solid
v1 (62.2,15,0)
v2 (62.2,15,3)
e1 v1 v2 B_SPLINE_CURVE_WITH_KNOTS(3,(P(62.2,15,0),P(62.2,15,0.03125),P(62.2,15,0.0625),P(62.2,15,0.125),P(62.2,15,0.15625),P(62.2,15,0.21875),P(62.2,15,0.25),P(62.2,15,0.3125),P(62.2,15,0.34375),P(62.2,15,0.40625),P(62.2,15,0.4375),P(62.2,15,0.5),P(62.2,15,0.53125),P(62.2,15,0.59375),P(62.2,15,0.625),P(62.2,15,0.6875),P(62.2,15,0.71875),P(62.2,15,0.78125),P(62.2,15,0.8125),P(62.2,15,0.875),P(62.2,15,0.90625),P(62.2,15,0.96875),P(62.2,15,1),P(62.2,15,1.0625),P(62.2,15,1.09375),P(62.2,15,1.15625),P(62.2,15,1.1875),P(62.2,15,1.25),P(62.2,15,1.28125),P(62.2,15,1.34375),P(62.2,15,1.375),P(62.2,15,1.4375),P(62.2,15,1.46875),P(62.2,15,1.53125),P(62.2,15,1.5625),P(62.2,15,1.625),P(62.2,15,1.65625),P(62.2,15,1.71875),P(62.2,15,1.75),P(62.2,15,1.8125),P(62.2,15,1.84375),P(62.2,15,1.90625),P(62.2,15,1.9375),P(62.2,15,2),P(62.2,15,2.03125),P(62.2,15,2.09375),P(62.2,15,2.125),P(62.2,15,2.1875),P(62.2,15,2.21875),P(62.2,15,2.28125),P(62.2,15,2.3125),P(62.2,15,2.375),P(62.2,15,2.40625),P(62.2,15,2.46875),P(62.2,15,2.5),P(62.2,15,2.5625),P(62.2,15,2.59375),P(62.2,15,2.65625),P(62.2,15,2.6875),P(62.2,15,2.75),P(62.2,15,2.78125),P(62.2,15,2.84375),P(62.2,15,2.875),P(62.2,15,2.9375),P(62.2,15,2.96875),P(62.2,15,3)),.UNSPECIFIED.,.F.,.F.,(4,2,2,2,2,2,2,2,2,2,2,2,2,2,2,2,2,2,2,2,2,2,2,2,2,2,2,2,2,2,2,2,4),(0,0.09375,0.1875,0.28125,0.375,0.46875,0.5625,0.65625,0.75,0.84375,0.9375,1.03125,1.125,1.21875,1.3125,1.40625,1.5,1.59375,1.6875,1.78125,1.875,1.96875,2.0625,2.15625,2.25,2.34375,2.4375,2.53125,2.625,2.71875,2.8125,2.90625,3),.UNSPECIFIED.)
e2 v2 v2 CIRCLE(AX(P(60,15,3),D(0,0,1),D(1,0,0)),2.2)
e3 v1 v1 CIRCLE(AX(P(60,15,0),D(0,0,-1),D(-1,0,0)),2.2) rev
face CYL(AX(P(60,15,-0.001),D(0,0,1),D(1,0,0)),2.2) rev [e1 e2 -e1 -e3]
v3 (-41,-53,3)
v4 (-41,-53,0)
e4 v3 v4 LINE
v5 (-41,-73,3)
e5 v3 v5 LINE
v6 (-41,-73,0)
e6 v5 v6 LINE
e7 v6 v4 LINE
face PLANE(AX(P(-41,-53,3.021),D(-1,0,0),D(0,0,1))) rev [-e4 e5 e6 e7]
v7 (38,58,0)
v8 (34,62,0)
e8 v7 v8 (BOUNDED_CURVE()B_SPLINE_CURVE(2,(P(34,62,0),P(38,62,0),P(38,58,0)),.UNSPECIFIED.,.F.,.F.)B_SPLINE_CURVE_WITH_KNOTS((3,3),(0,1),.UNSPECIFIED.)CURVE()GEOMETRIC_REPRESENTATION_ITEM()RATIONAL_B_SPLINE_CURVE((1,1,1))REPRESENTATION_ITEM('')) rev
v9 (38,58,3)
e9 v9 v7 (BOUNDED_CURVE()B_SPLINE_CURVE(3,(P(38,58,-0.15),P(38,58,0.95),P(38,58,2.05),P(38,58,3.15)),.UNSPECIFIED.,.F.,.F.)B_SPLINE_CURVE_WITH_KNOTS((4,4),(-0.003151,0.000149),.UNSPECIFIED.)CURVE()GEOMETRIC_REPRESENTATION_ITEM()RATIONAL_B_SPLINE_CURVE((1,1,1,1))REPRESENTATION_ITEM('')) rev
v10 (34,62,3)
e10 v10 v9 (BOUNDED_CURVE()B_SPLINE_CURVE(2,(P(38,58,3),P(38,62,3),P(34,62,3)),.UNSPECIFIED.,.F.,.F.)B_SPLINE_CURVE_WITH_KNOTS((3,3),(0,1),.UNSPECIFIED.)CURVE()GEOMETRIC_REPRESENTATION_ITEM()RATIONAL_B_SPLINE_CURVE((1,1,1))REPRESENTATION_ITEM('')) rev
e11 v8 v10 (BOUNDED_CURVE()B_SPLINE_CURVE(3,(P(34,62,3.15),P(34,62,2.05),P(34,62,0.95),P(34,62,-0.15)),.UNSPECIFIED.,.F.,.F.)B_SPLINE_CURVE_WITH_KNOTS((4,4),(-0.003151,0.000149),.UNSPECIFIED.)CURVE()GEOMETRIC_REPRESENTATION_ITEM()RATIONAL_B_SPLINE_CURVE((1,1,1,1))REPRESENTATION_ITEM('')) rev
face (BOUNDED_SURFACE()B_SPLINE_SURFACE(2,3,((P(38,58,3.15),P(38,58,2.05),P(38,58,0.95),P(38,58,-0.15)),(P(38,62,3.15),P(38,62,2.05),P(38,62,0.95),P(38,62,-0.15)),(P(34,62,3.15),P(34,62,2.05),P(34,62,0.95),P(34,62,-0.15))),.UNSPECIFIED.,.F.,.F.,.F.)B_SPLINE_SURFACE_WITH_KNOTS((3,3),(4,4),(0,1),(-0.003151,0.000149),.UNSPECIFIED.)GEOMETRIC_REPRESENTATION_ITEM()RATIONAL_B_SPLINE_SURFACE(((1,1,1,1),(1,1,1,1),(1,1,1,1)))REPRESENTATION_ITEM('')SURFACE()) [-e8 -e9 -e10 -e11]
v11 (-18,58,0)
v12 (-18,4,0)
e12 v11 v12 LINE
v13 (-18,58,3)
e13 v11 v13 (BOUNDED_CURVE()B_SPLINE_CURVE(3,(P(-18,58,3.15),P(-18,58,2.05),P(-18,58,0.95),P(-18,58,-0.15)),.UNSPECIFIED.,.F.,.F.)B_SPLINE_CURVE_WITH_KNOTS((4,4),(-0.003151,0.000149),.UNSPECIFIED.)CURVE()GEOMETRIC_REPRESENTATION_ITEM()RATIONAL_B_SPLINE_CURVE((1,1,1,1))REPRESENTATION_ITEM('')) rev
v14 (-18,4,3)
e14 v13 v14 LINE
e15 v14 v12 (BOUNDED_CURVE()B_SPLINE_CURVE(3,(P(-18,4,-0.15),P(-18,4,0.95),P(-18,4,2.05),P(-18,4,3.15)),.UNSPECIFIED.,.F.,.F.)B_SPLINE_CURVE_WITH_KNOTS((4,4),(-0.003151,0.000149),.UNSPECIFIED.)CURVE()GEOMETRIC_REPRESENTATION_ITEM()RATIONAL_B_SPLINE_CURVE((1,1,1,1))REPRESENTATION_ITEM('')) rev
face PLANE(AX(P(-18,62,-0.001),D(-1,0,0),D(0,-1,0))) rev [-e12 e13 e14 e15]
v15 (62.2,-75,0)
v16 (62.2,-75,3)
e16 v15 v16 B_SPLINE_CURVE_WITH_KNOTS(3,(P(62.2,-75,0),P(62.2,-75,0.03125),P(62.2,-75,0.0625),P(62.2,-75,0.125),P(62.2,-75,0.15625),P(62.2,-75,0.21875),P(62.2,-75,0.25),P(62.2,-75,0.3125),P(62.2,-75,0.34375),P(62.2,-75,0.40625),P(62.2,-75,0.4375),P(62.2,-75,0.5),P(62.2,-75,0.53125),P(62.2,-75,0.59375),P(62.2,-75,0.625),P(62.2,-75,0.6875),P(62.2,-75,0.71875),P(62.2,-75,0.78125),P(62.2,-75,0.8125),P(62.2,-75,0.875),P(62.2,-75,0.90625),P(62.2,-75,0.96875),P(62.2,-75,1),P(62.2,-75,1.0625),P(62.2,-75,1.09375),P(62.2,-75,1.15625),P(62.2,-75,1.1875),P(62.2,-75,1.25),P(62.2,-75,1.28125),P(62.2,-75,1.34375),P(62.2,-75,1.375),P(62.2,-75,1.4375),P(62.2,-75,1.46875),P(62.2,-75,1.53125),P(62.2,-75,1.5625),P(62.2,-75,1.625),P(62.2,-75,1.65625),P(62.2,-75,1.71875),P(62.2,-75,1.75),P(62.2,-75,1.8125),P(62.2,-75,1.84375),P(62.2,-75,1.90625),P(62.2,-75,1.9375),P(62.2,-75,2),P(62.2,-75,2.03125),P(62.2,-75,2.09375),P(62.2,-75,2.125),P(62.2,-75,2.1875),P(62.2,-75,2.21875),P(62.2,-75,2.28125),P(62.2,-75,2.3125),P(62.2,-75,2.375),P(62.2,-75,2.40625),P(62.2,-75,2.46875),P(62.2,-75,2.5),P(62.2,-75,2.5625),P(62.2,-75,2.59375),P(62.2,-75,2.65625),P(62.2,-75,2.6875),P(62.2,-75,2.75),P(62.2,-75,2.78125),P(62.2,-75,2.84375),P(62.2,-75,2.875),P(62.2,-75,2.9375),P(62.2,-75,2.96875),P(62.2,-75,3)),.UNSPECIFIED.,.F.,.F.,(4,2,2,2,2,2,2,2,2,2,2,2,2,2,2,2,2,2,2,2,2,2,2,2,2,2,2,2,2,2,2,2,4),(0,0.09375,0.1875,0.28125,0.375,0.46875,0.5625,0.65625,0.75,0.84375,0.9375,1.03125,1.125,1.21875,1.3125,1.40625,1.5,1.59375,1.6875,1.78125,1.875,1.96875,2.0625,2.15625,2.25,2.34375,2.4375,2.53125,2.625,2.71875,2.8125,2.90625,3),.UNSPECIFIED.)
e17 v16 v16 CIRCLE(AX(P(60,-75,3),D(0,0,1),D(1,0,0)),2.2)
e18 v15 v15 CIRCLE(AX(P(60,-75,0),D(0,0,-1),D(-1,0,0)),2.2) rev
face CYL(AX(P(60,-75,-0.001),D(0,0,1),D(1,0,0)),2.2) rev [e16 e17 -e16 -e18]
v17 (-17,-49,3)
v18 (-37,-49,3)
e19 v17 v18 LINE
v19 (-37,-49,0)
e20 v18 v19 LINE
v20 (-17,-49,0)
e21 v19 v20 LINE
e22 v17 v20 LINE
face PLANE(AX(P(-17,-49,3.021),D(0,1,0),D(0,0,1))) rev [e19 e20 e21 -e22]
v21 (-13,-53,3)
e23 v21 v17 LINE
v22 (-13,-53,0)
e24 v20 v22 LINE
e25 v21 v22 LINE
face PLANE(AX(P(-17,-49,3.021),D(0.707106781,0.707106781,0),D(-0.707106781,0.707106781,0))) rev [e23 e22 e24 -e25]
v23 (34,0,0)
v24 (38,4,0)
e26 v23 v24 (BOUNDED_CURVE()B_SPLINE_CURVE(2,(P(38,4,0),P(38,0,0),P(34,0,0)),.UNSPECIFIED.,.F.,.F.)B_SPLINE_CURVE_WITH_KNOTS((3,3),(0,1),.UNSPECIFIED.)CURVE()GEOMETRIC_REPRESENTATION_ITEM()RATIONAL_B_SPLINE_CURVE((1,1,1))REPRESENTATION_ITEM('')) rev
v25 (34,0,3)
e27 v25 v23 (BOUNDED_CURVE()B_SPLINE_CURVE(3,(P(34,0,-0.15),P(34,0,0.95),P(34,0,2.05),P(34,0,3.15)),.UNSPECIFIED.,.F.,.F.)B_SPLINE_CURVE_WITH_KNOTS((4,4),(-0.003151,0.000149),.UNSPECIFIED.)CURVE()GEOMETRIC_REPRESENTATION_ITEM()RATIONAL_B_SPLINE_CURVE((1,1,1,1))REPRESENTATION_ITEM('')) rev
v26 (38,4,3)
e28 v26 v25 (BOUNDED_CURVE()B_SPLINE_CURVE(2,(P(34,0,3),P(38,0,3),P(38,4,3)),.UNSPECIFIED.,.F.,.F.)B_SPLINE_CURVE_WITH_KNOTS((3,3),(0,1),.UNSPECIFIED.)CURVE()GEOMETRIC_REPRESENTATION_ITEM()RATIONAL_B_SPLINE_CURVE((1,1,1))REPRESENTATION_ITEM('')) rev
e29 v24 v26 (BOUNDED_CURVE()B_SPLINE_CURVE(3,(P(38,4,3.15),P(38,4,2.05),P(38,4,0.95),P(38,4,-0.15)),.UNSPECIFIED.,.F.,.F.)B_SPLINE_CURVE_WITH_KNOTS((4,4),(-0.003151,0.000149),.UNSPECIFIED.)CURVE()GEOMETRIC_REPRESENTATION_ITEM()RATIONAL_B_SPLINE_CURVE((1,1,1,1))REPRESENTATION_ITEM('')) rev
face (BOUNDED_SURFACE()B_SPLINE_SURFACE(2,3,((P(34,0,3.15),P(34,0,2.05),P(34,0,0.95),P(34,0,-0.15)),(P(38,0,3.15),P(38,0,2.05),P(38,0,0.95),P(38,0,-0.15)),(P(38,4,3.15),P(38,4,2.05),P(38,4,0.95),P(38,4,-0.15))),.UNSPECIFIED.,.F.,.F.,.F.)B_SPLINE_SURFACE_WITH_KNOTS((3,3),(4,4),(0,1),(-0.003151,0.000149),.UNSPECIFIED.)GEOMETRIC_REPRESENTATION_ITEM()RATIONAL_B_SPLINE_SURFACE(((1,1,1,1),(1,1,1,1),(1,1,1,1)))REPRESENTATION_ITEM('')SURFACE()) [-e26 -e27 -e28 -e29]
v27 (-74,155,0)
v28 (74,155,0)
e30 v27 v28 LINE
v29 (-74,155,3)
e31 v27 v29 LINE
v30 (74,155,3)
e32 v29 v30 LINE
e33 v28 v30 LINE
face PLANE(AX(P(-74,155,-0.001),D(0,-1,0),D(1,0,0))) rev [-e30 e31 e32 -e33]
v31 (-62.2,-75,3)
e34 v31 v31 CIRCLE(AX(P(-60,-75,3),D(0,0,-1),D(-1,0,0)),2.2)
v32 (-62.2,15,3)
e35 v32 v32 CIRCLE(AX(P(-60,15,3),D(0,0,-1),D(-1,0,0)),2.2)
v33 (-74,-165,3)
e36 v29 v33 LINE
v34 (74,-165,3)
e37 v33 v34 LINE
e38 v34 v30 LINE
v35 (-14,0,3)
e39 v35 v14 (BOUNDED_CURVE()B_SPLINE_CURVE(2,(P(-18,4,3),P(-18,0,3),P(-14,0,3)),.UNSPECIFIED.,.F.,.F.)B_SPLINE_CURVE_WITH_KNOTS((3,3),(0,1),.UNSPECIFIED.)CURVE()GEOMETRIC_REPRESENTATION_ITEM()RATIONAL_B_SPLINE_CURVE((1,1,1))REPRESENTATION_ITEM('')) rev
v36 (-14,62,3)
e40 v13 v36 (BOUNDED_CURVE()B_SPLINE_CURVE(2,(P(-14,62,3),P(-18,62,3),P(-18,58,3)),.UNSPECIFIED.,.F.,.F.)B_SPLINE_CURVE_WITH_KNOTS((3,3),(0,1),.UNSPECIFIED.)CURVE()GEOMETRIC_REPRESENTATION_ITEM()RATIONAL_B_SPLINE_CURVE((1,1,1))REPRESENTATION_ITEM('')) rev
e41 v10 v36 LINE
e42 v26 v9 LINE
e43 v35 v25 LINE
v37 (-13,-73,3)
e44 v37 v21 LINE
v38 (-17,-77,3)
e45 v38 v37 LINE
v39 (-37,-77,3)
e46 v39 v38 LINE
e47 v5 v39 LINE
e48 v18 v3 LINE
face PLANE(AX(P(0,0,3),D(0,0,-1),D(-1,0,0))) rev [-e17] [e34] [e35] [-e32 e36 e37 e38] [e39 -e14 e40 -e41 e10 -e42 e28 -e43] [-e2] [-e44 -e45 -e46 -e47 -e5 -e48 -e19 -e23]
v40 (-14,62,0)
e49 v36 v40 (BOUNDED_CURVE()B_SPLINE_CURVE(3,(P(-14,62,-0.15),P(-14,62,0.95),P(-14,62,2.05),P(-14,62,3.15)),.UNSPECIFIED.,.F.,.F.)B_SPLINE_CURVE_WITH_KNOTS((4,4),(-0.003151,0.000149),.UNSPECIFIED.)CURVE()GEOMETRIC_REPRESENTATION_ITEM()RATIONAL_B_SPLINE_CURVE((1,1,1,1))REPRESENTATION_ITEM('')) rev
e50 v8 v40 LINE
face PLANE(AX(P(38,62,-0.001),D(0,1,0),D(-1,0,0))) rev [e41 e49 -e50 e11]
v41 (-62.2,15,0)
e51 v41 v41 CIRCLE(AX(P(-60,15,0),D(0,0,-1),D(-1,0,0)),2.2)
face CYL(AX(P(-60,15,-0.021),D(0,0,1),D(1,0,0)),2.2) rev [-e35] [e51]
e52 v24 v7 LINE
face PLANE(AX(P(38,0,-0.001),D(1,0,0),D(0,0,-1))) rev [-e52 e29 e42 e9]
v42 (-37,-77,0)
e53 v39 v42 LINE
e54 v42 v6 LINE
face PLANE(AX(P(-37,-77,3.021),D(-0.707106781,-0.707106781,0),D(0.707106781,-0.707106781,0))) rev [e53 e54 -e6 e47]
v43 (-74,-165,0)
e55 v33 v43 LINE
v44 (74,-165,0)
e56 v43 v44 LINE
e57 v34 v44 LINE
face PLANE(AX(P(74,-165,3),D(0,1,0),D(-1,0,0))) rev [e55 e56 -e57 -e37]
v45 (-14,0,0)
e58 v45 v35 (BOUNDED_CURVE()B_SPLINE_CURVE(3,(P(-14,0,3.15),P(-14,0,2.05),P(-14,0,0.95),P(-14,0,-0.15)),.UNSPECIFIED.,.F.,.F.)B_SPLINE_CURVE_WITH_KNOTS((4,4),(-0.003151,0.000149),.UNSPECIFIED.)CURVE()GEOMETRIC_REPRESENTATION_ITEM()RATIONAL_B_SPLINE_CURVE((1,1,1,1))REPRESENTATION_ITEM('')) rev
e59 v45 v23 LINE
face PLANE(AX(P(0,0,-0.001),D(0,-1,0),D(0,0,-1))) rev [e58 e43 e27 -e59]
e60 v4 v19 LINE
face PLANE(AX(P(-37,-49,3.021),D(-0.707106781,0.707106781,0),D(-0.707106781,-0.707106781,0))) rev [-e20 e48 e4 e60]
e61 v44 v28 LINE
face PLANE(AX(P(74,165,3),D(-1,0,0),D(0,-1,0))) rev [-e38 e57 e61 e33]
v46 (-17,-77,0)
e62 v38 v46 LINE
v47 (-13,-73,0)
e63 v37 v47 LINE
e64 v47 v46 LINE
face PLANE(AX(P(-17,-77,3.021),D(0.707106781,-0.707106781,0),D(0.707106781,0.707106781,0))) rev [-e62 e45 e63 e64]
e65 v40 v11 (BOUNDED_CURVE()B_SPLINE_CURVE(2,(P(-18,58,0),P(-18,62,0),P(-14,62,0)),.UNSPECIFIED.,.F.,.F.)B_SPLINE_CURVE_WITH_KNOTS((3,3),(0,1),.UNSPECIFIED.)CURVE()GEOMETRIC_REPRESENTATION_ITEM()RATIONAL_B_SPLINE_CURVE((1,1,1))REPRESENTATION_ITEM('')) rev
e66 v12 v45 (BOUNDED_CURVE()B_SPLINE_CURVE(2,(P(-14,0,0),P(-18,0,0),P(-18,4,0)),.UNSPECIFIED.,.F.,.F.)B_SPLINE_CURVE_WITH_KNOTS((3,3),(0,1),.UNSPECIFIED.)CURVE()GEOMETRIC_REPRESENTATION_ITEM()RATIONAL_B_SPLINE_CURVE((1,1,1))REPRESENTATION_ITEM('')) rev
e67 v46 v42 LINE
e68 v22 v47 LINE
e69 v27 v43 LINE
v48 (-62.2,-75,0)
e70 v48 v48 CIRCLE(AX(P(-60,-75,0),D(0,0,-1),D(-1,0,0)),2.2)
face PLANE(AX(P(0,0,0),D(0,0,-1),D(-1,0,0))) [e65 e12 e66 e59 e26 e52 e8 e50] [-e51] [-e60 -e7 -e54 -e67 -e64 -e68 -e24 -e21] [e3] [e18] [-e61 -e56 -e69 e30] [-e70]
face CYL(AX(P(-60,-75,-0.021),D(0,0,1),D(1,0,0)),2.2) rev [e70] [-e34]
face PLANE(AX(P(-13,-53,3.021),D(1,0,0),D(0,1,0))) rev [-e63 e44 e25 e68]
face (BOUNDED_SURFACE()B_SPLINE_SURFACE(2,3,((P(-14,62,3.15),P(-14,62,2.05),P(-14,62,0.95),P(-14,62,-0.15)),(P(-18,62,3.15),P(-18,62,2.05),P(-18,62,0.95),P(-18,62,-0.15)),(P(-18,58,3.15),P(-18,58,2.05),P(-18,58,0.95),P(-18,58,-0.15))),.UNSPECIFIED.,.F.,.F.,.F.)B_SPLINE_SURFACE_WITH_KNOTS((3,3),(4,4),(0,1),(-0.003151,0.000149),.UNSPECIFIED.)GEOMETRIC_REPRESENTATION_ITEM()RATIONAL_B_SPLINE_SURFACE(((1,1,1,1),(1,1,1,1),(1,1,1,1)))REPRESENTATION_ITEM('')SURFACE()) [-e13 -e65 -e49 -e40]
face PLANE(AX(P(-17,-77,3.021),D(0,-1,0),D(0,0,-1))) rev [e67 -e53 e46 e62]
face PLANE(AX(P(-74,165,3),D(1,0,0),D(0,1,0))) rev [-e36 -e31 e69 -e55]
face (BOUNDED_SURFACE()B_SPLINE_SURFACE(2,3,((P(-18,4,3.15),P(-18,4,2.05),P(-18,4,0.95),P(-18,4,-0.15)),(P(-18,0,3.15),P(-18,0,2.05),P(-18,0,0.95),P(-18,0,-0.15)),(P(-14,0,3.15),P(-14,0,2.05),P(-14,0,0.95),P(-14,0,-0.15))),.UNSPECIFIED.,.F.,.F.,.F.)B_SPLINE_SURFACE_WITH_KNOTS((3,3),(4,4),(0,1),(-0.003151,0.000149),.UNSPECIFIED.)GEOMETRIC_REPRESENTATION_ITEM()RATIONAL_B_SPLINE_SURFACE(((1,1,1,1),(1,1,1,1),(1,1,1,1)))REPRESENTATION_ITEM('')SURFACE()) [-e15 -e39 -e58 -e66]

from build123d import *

# Parameters (mm, degrees)
ESQUISSE1_W             = 148
ESQUISSE1_H             = 330
BOSS_EXTRU_1_DEPTH      = 3
ENL_V_MAT_EXTRU_2_REACH = 182.859
ESQUISSE3_R             = 2.2
ENL_V_MAT_EXTRU_3_REACH = 182.859
ESQUISSE4_W             = 148
ESQUISSE4_H             = 10
ENL_V_MAT_EXTRU_4_REACH = 182.859
CONG_1_SIZE             = 4
ENL_V_MAT_EXTRU_5_REACH = 182.859


with BuildPart() as part:
    # Esquisse1 → Boss.-Extru.1 (new body)
    with BuildSketch(Plane.XY):
        Rectangle(ESQUISSE1_W, ESQUISSE1_H)
    extrude(amount=BOSS_EXTRU_1_DEPTH)

    # Esquisse3 → Enlèv. mat.-Extru.2 (cut, up to next)
    with BuildSketch(Plane.XY.offset(3), mode=Mode.PRIVATE) as enl_v_mat_extru_2_sk1:
        with Locations((60, -75)):
            Circle(ESQUISSE3_R)
    enl_v_mat_extru_2_tool1 = extrude(enl_v_mat_extru_2_sk1.sketch, amount=-ENL_V_MAT_EXTRU_2_REACH, mode=Mode.PRIVATE) & part.part
    # Esquisse3 → Enlèv. mat.-Extru.2 (cut, up to next)
    with BuildSketch(Plane.XY.offset(3), mode=Mode.PRIVATE) as enl_v_mat_extru_2_sk2:
        with Locations((60, 15)):
            Circle(ESQUISSE3_R)
    enl_v_mat_extru_2_tool2 = extrude(enl_v_mat_extru_2_sk2.sketch, amount=-ENL_V_MAT_EXTRU_2_REACH, mode=Mode.PRIVATE) & part.part
    enl_v_mat_extru_2_1 = enl_v_mat_extru_2_tool1.solids().sort_by_distance((60, -75, 3))[0]
    add(enl_v_mat_extru_2_1, mode=Mode.SUBTRACT)
    enl_v_mat_extru_2_2 = enl_v_mat_extru_2_tool2.solids().sort_by_distance((60, 15, 3))[0]
    add(enl_v_mat_extru_2_2, mode=Mode.SUBTRACT)
    enl_v_mat_extru_2 = enl_v_mat_extru_2_1 + enl_v_mat_extru_2_2  # Enlèv. mat.-Extru.2 as one shape, for the pattern or mirror that repeats it

    # Esquisse4 → Enlèv. mat.-Extru.3 (cut, up to next)
    with BuildSketch(Plane.XY.offset(3), mode=Mode.PRIVATE) as enl_v_mat_extru_3_sk1:
        with Locations((0, 160)):
            Rectangle(ESQUISSE4_W, ESQUISSE4_H)
    enl_v_mat_extru_3_tool1 = extrude(enl_v_mat_extru_3_sk1.sketch, amount=-ENL_V_MAT_EXTRU_3_REACH, mode=Mode.PRIVATE) & part.part
    add(enl_v_mat_extru_3_tool1.solids().sort_by_distance((0, 160, 3))[0], mode=Mode.SUBTRACT)

    # Esquisse5 → Enlèv. mat.-Extru.4 (cut, up to next)
    with BuildSketch(Plane.XY.offset(3), mode=Mode.PRIVATE) as enl_v_mat_extru_4_sk1:
        Polygon((0, 0), (38, 0), (38, 62), (-18, 62), (-18, 0), align=None)
    enl_v_mat_extru_4_tool1 = extrude(enl_v_mat_extru_4_sk1.sketch, amount=-ENL_V_MAT_EXTRU_4_REACH, mode=Mode.PRIVATE) & part.part
    add(enl_v_mat_extru_4_tool1.solids().sort_by_distance((10, 31, 3))[0], mode=Mode.SUBTRACT)

    # Congé1
    # a fillet whose section is not a circle: 4 mm, written as the material it adds along each edge
    with BuildSketch(Plane(origin=(38, 62, 3), x_dir=(-1, 0, 0), z_dir=(0, 0, -1)), Plane(origin=(-18, 62, 3), x_dir=(0, -1, 0), z_dir=(0, 0, -1)), Plane(origin=(38, 0, 3), x_dir=(0, 1, 0), z_dir=(0, 0, -1))) as cong_1_piece_1:
        with BuildLine():
            Bezier((CONG_1_SIZE, 0), (0, 0), (0, -CONG_1_SIZE), weights=[1, 1, 1])
            Line((0, -CONG_1_SIZE), (0, 0))
            Line((0, 0), (CONG_1_SIZE, 0))
        make_face()
    extrude(amount=3)
    with BuildSketch(Plane(origin=(-18, 0, 3), x_dir=(0, 1, 0), z_dir=(0, 0, -1))) as cong_1_piece_2:
        with BuildLine():
            Bezier((CONG_1_SIZE, 0), (0, 0), (0, CONG_1_SIZE), weights=[1, 1, 1])
            Line((0, CONG_1_SIZE), (0, 0))
            Line((0, 0), (CONG_1_SIZE, 0))
        make_face()
    extrude(amount=3)

    # Esquisse6 → Enlèv. mat.-Extru.5 (cut, up to next)
    with BuildSketch(Plane(origin=(0, 0, 0), x_dir=(-1, 0, 0), z_dir=(0, 0, -1)), mode=Mode.PRIVATE) as enl_v_mat_extru_5_sk1:
        Polygon((17, -49), (37, -49), (41, -53), (41, -73), (37, -77), (17, -77), (13, -73), (13, -53), align=None)
    enl_v_mat_extru_5_tool1 = extrude(enl_v_mat_extru_5_sk1.sketch, amount=-ENL_V_MAT_EXTRU_5_REACH, mode=Mode.PRIVATE) & part.part
    add(enl_v_mat_extru_5_tool1.solids().sort_by_distance((-27, -63, 0))[0], mode=Mode.SUBTRACT)

    # Symétrie1: Enlèv. mat.-Extru.2 across plane
    add(enl_v_mat_extru_2.mirror(Plane(origin=(0, 0, 0), x_dir=(0, 0, 1), z_dir=(1, 0, 0))), mode=Mode.SUBTRACT)


solid = part.part
